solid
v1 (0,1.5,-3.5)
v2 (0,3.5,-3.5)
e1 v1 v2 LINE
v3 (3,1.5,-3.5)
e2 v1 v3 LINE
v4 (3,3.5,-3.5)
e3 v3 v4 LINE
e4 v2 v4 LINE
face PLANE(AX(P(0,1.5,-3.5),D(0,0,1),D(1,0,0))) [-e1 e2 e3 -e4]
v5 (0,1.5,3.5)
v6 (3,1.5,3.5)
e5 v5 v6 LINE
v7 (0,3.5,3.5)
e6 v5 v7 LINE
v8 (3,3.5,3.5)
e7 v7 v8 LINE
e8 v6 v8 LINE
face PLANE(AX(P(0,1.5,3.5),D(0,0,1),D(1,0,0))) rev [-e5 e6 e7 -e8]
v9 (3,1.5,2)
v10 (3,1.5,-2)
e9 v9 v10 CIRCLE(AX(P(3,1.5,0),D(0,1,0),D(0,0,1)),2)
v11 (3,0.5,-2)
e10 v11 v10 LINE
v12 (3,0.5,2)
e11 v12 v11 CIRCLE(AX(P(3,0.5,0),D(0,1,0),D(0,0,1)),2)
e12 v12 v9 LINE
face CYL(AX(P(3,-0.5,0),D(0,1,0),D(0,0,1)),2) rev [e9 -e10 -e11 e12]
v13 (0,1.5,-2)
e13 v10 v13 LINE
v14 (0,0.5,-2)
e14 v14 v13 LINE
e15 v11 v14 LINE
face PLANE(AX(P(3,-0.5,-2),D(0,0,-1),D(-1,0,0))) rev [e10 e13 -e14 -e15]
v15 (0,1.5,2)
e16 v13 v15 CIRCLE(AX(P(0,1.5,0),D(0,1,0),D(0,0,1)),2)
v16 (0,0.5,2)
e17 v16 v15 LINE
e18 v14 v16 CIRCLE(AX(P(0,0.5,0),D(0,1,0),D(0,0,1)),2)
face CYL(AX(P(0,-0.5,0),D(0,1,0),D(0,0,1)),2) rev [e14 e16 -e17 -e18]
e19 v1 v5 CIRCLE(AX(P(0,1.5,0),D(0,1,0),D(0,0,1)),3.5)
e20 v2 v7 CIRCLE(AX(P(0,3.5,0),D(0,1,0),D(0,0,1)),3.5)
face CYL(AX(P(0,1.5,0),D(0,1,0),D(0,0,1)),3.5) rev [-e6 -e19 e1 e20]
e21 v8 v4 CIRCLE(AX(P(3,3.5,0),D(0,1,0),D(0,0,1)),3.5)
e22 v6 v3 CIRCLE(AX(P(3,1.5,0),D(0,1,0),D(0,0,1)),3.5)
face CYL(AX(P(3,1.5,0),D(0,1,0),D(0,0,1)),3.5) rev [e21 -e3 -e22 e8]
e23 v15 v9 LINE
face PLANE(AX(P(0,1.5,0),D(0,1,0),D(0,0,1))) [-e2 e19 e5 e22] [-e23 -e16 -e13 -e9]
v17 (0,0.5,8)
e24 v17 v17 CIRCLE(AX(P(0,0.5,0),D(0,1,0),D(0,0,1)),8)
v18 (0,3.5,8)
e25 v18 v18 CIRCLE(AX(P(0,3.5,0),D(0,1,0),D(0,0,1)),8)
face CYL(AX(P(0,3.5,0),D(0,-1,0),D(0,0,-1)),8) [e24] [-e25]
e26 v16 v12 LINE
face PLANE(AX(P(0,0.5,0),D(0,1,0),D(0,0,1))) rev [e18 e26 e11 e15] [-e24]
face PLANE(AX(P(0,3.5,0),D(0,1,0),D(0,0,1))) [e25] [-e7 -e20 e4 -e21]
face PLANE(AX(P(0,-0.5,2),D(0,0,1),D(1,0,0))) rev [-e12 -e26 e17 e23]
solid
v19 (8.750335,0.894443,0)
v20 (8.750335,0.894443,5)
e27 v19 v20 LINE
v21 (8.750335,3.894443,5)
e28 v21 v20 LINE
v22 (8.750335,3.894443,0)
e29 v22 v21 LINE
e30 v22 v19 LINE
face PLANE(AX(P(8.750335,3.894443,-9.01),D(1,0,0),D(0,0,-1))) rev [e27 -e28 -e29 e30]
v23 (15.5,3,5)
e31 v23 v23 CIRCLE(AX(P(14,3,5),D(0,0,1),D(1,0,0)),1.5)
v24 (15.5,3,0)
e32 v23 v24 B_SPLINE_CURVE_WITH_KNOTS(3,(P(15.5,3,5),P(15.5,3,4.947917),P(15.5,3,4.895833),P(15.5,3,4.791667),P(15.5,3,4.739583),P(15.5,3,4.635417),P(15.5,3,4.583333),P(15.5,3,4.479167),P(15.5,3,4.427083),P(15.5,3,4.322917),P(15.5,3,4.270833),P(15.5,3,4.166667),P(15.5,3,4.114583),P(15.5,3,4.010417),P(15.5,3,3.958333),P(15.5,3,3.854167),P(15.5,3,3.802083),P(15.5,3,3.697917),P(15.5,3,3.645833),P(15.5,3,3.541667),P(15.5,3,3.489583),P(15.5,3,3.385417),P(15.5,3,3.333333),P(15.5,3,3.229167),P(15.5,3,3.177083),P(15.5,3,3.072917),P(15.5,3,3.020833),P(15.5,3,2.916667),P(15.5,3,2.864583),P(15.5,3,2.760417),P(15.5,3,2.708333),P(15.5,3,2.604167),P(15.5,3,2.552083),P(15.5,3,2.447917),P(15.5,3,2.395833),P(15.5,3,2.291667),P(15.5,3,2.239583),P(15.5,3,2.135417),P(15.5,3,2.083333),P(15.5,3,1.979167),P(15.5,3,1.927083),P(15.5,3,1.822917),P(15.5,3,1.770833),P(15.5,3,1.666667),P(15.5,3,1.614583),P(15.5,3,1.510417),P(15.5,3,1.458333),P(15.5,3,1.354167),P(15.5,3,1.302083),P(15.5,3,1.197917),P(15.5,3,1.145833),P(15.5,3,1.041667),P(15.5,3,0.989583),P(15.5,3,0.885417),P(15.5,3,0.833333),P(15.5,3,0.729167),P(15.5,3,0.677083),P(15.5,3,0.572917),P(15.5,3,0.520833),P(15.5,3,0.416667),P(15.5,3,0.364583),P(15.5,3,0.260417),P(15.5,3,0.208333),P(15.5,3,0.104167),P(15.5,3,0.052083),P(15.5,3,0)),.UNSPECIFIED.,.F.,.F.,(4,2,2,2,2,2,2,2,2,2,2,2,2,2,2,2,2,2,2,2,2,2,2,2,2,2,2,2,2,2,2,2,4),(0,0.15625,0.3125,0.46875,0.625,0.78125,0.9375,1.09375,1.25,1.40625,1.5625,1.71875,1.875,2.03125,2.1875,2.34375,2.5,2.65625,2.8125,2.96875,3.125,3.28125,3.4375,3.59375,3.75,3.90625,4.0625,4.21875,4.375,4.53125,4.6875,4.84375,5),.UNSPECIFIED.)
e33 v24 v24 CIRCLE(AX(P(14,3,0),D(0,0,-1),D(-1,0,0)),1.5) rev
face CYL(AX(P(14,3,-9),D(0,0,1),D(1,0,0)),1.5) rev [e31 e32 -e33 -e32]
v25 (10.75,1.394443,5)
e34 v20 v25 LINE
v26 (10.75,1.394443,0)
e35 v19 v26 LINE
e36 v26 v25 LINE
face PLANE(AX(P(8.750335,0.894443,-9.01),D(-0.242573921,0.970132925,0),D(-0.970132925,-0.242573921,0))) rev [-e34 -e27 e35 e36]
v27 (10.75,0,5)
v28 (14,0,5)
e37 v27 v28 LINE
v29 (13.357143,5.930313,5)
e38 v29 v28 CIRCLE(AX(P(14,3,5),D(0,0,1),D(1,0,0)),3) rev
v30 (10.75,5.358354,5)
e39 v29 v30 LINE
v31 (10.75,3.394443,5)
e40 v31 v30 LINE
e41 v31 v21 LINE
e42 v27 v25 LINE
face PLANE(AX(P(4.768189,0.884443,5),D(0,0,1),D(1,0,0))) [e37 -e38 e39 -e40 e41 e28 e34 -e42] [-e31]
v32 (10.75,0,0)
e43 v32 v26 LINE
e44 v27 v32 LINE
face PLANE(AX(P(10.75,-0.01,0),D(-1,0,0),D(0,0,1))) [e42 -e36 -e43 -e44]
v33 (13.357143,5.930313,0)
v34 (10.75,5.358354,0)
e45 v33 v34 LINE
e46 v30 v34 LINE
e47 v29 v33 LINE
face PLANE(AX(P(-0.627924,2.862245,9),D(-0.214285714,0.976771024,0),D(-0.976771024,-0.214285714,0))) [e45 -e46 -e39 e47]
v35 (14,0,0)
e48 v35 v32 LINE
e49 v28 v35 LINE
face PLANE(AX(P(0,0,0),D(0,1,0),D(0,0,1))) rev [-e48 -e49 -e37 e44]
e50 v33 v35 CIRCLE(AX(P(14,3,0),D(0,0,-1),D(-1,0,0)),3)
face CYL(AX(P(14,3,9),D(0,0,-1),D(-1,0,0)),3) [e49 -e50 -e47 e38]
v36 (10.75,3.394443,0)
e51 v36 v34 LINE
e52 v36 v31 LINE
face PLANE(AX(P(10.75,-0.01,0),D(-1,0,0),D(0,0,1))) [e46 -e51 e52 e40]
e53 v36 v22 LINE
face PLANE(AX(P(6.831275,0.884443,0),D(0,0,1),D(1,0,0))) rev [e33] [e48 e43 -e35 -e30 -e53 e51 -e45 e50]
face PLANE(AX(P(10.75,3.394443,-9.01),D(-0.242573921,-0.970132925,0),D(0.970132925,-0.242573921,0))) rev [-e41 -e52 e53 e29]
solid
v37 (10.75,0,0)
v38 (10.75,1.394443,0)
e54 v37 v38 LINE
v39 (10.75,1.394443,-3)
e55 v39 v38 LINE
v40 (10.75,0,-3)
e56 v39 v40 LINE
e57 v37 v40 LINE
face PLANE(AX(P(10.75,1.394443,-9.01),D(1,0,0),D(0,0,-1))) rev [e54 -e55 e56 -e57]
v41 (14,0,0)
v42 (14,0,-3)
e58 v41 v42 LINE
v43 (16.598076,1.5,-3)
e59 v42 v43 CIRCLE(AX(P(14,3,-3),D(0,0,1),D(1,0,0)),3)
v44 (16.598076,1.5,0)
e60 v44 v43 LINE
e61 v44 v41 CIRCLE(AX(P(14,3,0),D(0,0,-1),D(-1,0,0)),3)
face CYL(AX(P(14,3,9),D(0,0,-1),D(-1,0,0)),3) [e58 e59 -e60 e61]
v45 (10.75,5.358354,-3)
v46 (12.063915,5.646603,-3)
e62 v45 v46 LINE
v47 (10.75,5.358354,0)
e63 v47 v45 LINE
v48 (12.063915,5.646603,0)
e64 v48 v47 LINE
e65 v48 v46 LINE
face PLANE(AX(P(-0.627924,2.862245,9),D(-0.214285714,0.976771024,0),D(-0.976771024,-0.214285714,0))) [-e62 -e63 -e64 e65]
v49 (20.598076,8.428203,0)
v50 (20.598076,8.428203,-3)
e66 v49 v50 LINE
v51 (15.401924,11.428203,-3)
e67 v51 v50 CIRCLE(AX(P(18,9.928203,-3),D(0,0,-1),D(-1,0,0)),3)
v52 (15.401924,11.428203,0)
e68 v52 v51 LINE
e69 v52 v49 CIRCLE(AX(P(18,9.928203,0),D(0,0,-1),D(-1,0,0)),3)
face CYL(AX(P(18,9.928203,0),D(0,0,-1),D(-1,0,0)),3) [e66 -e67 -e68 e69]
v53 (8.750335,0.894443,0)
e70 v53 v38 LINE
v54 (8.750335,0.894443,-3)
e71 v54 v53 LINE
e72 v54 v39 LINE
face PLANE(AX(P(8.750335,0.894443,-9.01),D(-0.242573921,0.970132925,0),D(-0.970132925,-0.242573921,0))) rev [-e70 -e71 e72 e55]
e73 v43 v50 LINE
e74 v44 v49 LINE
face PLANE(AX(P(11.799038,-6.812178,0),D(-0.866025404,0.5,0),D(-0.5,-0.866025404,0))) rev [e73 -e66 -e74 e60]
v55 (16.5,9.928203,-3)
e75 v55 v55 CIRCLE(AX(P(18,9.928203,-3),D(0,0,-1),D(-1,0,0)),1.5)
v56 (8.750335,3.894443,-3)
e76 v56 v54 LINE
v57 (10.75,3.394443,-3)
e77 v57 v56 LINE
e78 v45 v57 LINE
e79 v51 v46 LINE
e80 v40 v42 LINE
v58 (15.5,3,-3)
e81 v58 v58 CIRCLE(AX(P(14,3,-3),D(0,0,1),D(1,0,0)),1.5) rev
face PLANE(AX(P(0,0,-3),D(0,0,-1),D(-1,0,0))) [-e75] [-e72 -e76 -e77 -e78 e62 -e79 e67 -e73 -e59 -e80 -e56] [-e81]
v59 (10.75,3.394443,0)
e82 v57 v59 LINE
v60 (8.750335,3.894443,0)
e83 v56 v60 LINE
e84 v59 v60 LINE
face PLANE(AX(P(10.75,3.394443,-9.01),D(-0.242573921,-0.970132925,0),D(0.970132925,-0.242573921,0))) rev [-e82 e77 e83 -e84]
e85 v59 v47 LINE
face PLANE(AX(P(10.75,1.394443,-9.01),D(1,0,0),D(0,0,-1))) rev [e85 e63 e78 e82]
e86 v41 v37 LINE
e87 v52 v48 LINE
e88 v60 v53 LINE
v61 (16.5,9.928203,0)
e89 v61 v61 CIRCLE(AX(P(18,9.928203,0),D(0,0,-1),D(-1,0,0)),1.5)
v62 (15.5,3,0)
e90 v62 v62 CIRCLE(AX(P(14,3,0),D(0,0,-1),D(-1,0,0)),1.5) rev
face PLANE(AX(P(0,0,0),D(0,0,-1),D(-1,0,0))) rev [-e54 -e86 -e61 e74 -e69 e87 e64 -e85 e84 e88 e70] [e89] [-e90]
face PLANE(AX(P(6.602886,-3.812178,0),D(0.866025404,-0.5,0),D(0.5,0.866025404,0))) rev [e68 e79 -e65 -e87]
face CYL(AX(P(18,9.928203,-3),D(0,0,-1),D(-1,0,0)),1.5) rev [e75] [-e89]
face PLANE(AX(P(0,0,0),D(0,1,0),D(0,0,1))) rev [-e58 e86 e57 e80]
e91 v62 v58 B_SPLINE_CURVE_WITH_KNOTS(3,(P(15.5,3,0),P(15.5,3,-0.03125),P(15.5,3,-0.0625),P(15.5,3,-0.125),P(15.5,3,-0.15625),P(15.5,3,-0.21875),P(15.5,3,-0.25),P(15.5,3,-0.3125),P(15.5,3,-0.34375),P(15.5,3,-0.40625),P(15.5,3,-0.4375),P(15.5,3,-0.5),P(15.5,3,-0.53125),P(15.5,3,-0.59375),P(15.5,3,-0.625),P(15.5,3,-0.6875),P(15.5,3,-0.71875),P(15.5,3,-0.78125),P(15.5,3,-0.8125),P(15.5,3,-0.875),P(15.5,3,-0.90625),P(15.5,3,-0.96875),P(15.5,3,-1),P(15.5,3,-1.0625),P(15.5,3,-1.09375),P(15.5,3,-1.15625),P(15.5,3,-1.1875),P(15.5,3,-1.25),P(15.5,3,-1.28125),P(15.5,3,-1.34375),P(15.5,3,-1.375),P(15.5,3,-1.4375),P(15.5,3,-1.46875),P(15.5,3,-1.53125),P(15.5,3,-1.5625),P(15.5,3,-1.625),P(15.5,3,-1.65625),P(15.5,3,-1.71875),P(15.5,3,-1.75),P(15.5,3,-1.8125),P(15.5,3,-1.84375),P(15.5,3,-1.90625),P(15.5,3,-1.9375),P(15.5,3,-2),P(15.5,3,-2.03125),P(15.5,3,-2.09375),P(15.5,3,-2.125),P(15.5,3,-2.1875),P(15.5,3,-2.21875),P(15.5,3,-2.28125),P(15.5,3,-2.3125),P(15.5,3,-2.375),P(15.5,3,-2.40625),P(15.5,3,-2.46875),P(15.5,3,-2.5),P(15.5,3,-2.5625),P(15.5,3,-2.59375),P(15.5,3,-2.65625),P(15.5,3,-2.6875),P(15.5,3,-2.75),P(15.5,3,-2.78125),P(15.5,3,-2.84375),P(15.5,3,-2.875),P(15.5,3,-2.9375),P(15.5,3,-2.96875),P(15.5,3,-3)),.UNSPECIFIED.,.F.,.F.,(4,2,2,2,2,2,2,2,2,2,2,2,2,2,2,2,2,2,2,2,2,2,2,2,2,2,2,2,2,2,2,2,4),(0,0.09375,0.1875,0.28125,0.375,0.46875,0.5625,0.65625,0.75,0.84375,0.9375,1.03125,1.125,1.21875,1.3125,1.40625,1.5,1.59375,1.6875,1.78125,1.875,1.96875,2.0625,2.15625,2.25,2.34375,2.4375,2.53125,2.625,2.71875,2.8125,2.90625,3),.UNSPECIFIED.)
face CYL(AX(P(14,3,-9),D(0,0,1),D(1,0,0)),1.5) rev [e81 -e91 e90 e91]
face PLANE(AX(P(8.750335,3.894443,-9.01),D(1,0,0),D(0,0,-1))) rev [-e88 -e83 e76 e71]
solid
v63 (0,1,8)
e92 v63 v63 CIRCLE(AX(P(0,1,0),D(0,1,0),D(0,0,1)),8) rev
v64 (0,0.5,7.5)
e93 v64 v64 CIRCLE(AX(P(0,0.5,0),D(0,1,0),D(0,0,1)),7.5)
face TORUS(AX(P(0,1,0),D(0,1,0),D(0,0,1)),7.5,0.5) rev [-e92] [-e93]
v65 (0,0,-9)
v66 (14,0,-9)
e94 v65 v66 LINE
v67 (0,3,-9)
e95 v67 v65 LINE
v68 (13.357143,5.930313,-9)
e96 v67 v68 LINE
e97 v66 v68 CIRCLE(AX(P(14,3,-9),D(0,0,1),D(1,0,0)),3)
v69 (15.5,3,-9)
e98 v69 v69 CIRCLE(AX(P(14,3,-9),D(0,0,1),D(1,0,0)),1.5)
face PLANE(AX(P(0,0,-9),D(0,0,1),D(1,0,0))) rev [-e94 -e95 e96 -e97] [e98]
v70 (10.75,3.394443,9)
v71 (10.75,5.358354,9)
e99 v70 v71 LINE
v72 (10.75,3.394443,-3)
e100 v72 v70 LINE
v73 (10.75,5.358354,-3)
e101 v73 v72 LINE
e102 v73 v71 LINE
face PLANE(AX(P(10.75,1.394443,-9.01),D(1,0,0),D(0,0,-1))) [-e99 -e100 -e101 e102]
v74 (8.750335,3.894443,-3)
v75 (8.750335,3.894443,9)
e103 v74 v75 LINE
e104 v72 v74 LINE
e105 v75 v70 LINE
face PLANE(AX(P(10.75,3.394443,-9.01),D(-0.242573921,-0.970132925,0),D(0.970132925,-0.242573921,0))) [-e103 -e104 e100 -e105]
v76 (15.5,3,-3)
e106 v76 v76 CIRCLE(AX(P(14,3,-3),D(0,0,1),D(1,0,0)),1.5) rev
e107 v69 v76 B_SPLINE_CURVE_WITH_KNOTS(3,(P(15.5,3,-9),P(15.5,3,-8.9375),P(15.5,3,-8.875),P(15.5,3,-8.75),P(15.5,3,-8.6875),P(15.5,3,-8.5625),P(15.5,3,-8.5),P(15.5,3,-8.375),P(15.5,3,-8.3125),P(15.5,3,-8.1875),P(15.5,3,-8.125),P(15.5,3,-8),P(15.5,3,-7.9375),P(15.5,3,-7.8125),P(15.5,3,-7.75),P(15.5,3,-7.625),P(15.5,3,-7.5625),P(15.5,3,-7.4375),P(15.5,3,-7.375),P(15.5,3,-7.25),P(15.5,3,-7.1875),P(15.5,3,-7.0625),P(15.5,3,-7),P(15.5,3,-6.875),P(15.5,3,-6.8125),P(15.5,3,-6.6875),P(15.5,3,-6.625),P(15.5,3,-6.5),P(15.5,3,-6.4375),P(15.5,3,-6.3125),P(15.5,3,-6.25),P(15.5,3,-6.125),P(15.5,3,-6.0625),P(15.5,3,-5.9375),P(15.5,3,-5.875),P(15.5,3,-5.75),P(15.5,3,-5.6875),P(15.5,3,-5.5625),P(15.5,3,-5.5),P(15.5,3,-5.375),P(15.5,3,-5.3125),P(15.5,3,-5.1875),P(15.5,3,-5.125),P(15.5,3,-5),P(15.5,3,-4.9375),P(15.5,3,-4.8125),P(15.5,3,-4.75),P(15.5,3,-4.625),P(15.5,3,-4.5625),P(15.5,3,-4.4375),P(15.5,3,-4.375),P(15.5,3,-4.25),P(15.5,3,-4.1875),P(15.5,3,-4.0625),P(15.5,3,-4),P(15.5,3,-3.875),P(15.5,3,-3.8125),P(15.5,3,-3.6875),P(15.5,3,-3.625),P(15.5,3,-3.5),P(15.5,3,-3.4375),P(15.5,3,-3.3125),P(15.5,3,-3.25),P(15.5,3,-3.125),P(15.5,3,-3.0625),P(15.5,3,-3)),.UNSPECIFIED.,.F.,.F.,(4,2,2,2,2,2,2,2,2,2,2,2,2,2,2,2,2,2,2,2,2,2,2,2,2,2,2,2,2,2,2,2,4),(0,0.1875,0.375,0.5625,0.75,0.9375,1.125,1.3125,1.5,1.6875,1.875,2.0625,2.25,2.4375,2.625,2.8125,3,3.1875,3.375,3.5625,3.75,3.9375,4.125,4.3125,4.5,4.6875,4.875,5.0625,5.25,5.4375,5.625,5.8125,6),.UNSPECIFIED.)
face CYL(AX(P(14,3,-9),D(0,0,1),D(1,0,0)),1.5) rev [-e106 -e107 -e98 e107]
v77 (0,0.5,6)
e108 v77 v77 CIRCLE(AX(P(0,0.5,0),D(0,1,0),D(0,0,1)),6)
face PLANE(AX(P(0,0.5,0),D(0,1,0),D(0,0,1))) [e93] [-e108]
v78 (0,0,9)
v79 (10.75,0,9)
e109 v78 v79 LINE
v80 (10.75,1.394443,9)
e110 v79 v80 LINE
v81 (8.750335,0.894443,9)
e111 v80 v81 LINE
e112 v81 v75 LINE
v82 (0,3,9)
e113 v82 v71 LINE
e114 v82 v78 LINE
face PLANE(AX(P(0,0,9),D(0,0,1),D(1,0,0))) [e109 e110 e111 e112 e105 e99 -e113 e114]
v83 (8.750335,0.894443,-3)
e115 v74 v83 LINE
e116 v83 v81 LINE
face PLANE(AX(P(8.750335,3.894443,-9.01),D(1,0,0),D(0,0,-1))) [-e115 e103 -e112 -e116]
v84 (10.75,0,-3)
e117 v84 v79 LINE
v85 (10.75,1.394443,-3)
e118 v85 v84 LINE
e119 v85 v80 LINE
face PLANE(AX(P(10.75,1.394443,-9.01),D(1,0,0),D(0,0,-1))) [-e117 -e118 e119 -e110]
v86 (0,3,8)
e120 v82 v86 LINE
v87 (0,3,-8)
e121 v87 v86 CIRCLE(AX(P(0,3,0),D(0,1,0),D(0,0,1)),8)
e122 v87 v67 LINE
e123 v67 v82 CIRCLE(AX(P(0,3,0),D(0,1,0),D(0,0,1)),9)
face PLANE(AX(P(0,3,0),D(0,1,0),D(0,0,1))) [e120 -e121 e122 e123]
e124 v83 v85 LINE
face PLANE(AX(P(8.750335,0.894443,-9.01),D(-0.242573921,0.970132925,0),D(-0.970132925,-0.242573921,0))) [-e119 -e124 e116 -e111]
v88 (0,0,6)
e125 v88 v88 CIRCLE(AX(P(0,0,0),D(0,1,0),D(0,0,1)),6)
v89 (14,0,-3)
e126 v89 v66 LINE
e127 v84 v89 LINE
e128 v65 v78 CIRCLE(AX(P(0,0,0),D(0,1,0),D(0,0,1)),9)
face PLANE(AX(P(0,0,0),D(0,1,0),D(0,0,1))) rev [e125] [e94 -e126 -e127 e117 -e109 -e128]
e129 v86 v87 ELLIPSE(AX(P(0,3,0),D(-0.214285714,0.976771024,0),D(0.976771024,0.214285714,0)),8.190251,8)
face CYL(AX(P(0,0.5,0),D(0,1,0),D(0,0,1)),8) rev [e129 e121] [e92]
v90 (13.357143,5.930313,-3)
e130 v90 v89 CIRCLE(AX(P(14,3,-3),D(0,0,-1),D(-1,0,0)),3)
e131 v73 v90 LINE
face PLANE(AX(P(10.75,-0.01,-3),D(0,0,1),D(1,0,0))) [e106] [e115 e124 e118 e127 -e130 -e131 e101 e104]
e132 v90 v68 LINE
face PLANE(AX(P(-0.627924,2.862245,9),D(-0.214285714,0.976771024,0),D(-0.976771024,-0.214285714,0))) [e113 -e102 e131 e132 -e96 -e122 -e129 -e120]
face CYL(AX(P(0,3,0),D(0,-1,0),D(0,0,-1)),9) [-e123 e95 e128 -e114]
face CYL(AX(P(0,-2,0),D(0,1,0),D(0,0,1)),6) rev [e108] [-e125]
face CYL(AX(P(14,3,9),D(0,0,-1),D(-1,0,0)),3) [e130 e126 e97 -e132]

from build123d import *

# Parameters (mm, degrees)
SKETCH1_R               = 9
BOSS_EXTRUDE1_DEPTH     = 3
BOSS_EXTRUDE2_START     = -9
BOSS_EXTRUDE2_DEPTH     = 18
SKETCH5_R               = 8
CUT_EXTRUDE3_DEPTH      = 2.5
SKETCH6_R               = 6
CUT_EXTRUDE4_DEPTH      = 2.5
FILLET3_R               = 0.5
CUT_EXTRUDE5_DEPTH      = 4
HOLE1_START             = -9
HOLE1_OUTLINE_R         = 1.5
HOLE1_DEPTH             = 14
BOSS_EXTRUDE4_DEPTH     = 3
F_3_0_MM_DOWEL_HOLES1_D = 3
SKETCH14_R              = 8
BOSS_EXTRUDE5_DEPTH     = 3
CUT_EXTRUDE6_DEPTH      = 2
CUT_EXTRUDE7_DEPTH      = 2
SPLIT1_SURFACE_1_BACK   = 38.298
SPLIT1_SURFACE_1_DEPTH  = 76.596
SPLIT1_SURFACE_2_BACK   = 38.298
SPLIT1_SURFACE_2_DEPTH  = 76.596
SPLIT2_SURFACE_3_BACK   = 38.298
SPLIT2_SURFACE_3_DEPTH  = 76.596
SPLIT2_SURFACE_4_BACK   = 38.298
SPLIT2_SURFACE_4_DEPTH  = 76.596
SPLIT3_SURFACE_5_BACK   = 38.298
SPLIT3_SURFACE_5_DEPTH  = 76.596
SPLIT3_SURFACE_6_BACK   = 38.298
SPLIT3_SURFACE_6_DEPTH  = 76.596
SPLIT4_SURFACE_7_BACK   = 38.298
SPLIT4_SURFACE_7_DEPTH  = 76.596
SPLIT4_SURFACE_8_BACK   = 38.298
SPLIT4_SURFACE_8_DEPTH  = 76.596
SPLIT5_START            = -3
SPLIT5_DEPTH            = 3
SPLIT5_2_DEPTH          = 12
SPLIT5_3_DEPTH          = 5
SPLIT5_START_2          = 5
SPLIT5_4_DEPTH          = 4


with BuildPart() as part:
    # Sketch1 → Boss-Extrude1 (new body)
    with BuildSketch(Plane(origin=(0, 0, 0), x_dir=(1, 0, 0), z_dir=(0, 1, 0))):
        with Locations(Location((0, 0, 0), (0, 0, 270))):
            Circle(SKETCH1_R)
    extrude(amount=BOSS_EXTRUDE1_DEPTH)

    # Boss-Extrude2: read off the stored shape, not the designer's step
    # Boss-Extrude2 outline → Boss-Extrude2 (add)
    with BuildSketch(Plane.XY.offset(BOSS_EXTRUDE2_START)):
        with BuildLine():
            Line((13.357142857, 5.930313071), (0, 3))
            Line((0, 3), (0, 0))
            Line((0, 0), (14, 0))
            ThreePointArc((14, 0), (16.982527386, 3.323311604), (13.357142857, 5.930313071))
        make_face()
    extrude(amount=BOSS_EXTRUDE2_DEPTH)

    # Sketch5 → Cut-Extrude3 (cut, symmetric)
    with BuildSketch(Plane(origin=(0, 3, 0), x_dir=(1, 0, 0), z_dir=(0, 1, 0))):
        with Locations(Location((0, 0, 0), (0, 0, 270))):
            Circle(SKETCH5_R)
    extrude(amount=CUT_EXTRUDE3_DEPTH, both=True, mode=Mode.SUBTRACT)

    # Sketch6 → Cut-Extrude4 (cut, symmetric)
    with BuildSketch(Plane(origin=(0, 0.5, 0), x_dir=(1, 0, 0), z_dir=(0, 1, 0))):
        with Locations(Location((0, 0, 0), (0, 0, 270))):
            Circle(SKETCH6_R)
    extrude(amount=CUT_EXTRUDE4_DEPTH, both=True, mode=Mode.SUBTRACT)

    # Fillet3
    fillet3_edges = [part.edges().sort_by_distance(p)[0] for p in [
        (0, 0.5, -8),
    ]]
    fillet(fillet3_edges, radius=FILLET3_R)

    # Sketch7 → Cut-Extrude5 (cut)
    with BuildSketch(Plane(origin=(0, 0, 9), x_dir=(-1, 0, 0), z_dir=(0, 0, -1))):
        Polygon((-10.75, -52.569250145), (-10.75, -0.796086747), (-10.75, 6.228178627), (-10.75, 58.001342025), (-114.296326796, 58.001342025), (-114.296326796, -52.569250145), align=None)
    extrude(amount=CUT_EXTRUDE5_DEPTH, mode=Mode.SUBTRACT)

    # Hole1: read off the stored shape, not the designer's step
    # Hole1 outline → Hole1 (cut)
    with BuildSketch(Plane.XY.offset(HOLE1_START)):
        with Locations((14, 3)):
            Circle(HOLE1_OUTLINE_R)
    extrude(amount=HOLE1_DEPTH, mode=Mode.SUBTRACT)

    # Sketch9 → Boss-Extrude4 (add)
    with BuildSketch(Plane(origin=(0, 0, -3), x_dir=(-1, 0, 0), z_dir=(0, 0, -1))):
        with BuildLine():
            Line((-20.598076211, 8.42820323), (-16.598076211, 1.5))
            ThreePointArc((-16.598076211, 1.5), (-16.421288681, 4.771259756), (-13.357142857, 5.930313071))
            Line((-13.357142857, 5.930313071), (-12.063915065, 5.646602524))
            Line((-12.063915065, 5.646602524), (-15.401923789, 11.42820323))
            ThreePointArc((-15.401923789, 11.42820323), (-19.5, 12.526279442), (-20.598076211, 8.42820323))
        make_face()
    extrude(amount=-BOSS_EXTRUDE4_DEPTH)

    # Ø3.0 mm Dowel Holes1 (through all)
    with Locations(Plane(origin=(18, 9.92820323, -3), x_dir=(-1, 0, 0), z_dir=(0, 0, -1))):
        with Locations((0, 0)):
            Hole(F_3_0_MM_DOWEL_HOLES1_D / 2)


with BuildPart() as body_2:
    # Sketch14 → Boss-Extrude5 (new body)
    with BuildSketch(Plane(origin=(0, 0.5, 0), x_dir=(1, 0, 0), z_dir=(0, 1, 0))):
        with Locations(Location((0, 0, 0), (0, 0, 270))):
            Circle(SKETCH14_R)
    extrude(amount=BOSS_EXTRUDE5_DEPTH)

    # Sketch15 → Cut-Extrude6 (cut)
    with BuildSketch(Plane(origin=(0, 3.5, 0), x_dir=(1, 0, 0), z_dir=(0, 1, 0))):
        with BuildLine():
            Line((0, 3.5), (3, 3.5))
            ThreePointArc((3, 3.5), (6.5, 0), (3, -3.5))
            Line((3, -3.5), (0, -3.5))
            ThreePointArc((0, -3.5), (-3.5, 0), (0, 3.5))
        make_face()
    extrude(amount=-CUT_EXTRUDE6_DEPTH, mode=Mode.SUBTRACT)

    # Sketch17 → Cut-Extrude7 (cut)
    with BuildSketch(Plane(origin=(0, 1.5, 0), x_dir=(1, 0, 0), z_dir=(0, 1, 0))):
        with BuildLine():
            Line((0, -2), (3, -2))
            ThreePointArc((3, -2), (5, 0), (3, 2))
            Line((3, 2), (0, 2))
            ThreePointArc((0, 2), (-2, 0), (0, -2))
        make_face()
    extrude(amount=-CUT_EXTRUDE7_DEPTH, mode=Mode.SUBTRACT)


with BuildPart() as body_3:
    # Split1: the piece behind the surface
    add(part.part)
    # Split1 surface: a surface, the sketch's curves swept straight by 76.596 mm
    with BuildLine(Plane.XY.offset(9).offset(-SPLIT1_SURFACE_1_BACK), mode=Mode.PRIVATE) as split1_surface_1_path:
        Line((10.75, 7.850645476), (10.75, 3.394442709))
        Line((10.75, 3.394442709), (8.750335479, 3.894442709))
        Line((8.750335479, 3.894442709), (8.750335479, 0.894442709))
        Line((8.750335479, 0.894442709), (10.75, 1.394442709))
        Line((10.75, 1.394442709), (10.75, -1.763593227))
    split1_surface_1 = Shell.extrude(split1_surface_1_path.wire(), (0 * SPLIT1_SURFACE_1_DEPTH, 0 * SPLIT1_SURFACE_1_DEPTH, 1 * SPLIT1_SURFACE_1_DEPTH))
    split(bisect_by=split1_surface_1, keep=Keep.BOTTOM)


with BuildPart() as part_1:
    add(part.part)

    # Split1: split by a surface, the side it looks to stays
    # Split1 surface: a surface, the sketch's curves swept straight by 76.596 mm
    with BuildLine(Plane.XY.offset(9).offset(-SPLIT1_SURFACE_2_BACK), mode=Mode.PRIVATE) as split1_surface_2_path:
        Line((10.75, 7.850645476), (10.75, 3.394442709))
        Line((10.75, 3.394442709), (8.750335479, 3.894442709))
        Line((8.750335479, 3.894442709), (8.750335479, 0.894442709))
        Line((8.750335479, 0.894442709), (10.75, 1.394442709))
        Line((10.75, 1.394442709), (10.75, -1.763593227))
    split1_surface_2 = Shell.extrude(split1_surface_2_path.wire(), (0 * SPLIT1_SURFACE_2_DEPTH, 0 * SPLIT1_SURFACE_2_DEPTH, 1 * SPLIT1_SURFACE_2_DEPTH))
    split(bisect_by=split1_surface_2, keep=Keep.TOP)


with BuildPart() as body_4:
    # Split2: the piece behind the surface
    add(part_1.part)
    # Split2 surface: a surface, the sketch's curves swept straight by 76.596 mm
    with BuildLine(Plane(origin=(0, 3.5, 0), x_dir=(1, 0, 0), z_dir=(0, 1, 0)).offset(-SPLIT2_SURFACE_3_BACK), mode=Mode.PRIVATE) as split2_surface_3_path:
        Line((27.399686623, 0), (10.75, 0))
        Line((10.75, 0), (10.75, 3))
        Line((10.75, 3), (26.181796161, 3))
    split2_surface_3 = Shell.extrude(split2_surface_3_path.wire(), (0 * SPLIT2_SURFACE_3_DEPTH, 1 * SPLIT2_SURFACE_3_DEPTH, 0 * SPLIT2_SURFACE_3_DEPTH))
    split(bisect_by=split2_surface_3, keep=Keep.BOTTOM)


with BuildPart() as part_2:
    add(part_1.part)

    # Split2: split by a surface, the side it looks to stays
    # Split2 surface: a surface, the sketch's curves swept straight by 76.596 mm
    with BuildLine(Plane(origin=(0, 3.5, 0), x_dir=(1, 0, 0), z_dir=(0, 1, 0)).offset(-SPLIT2_SURFACE_4_BACK), mode=Mode.PRIVATE) as split2_surface_4_path:
        Line((27.399686623, 0), (10.75, 0))
        Line((10.75, 0), (10.75, 3))
        Line((10.75, 3), (26.181796161, 3))
    split2_surface_4 = Shell.extrude(split2_surface_4_path.wire(), (0 * SPLIT2_SURFACE_4_DEPTH, 1 * SPLIT2_SURFACE_4_DEPTH, 0 * SPLIT2_SURFACE_4_DEPTH))
    split(bisect_by=split2_surface_4, keep=Keep.TOP)


with BuildPart() as body_5:
    # Split3: the piece behind the surface
    add(part_2.part)
    # Split3 surface: a surface, the sketch's curves swept straight by 76.596 mm
    with BuildLine(Plane(origin=(0, 3.5, 0), x_dir=(1, 0, 0), z_dir=(0, 1, 0)).offset(-SPLIT3_SURFACE_5_BACK), mode=Mode.PRIVATE) as split3_surface_5_path:
        Line((10.75, 0), (24.171696764, 0))
        Line((24.171696764, 0), (24.171696764, -5))
        Line((24.171696764, -5), (10.75, -5))
        Line((10.75, -5), (10.75, 0))
    split3_surface_5 = Shell.extrude(split3_surface_5_path.wire(), (0 * SPLIT3_SURFACE_5_DEPTH, 1 * SPLIT3_SURFACE_5_DEPTH, 0 * SPLIT3_SURFACE_5_DEPTH))
    split(bisect_by=split3_surface_5, keep=Keep.BOTTOM)


with BuildPart() as part_3:
    add(part_2.part)

    # Split3: split by a surface, the side it looks to stays
    # Split3 surface: a surface, the sketch's curves swept straight by 76.596 mm
    with BuildLine(Plane(origin=(0, 3.5, 0), x_dir=(1, 0, 0), z_dir=(0, 1, 0)).offset(-SPLIT3_SURFACE_6_BACK), mode=Mode.PRIVATE) as split3_surface_6_path:
        Line((10.75, 0), (24.171696764, 0))
        Line((24.171696764, 0), (24.171696764, -5))
        Line((24.171696764, -5), (10.75, -5))
        Line((10.75, -5), (10.75, 0))
    split3_surface_6 = Shell.extrude(split3_surface_6_path.wire(), (0 * SPLIT3_SURFACE_6_DEPTH, 1 * SPLIT3_SURFACE_6_DEPTH, 0 * SPLIT3_SURFACE_6_DEPTH))
    split(bisect_by=split3_surface_6, keep=Keep.TOP)


with BuildPart() as body_6:
    # Split4: the piece behind the surface
    add(part_3.part)
    # Split4 surface: a surface, the sketch's curves swept straight by 76.596 mm
    with BuildLine(Plane.XY.offset(9).offset(-SPLIT4_SURFACE_7_BACK), mode=Mode.PRIVATE) as split4_surface_7_path:
        Line((8.750335479, 0.894442709), (10.75, 1.394442709))
        Line((10.75, 1.394442709), (10.75, 3.394442709))
        Line((10.75, 3.394442709), (8.750335479, 3.894442709))
        Line((8.750335479, 3.894442709), (8.750335479, 0.894442709))
    split4_surface_7 = Shell.extrude(split4_surface_7_path.wire(), (0 * SPLIT4_SURFACE_7_DEPTH, 0 * SPLIT4_SURFACE_7_DEPTH, 1 * SPLIT4_SURFACE_7_DEPTH))
    split(bisect_by=split4_surface_7, keep=Keep.BOTTOM)


with BuildPart() as part_4:
    add(part_3.part)

    # Split4: split by a surface, the side it looks to stays
    # Split4 surface: a surface, the sketch's curves swept straight by 76.596 mm
    with BuildLine(Plane.XY.offset(9).offset(-SPLIT4_SURFACE_8_BACK), mode=Mode.PRIVATE) as split4_surface_8_path:
        Line((8.750335479, 0.894442709), (10.75, 1.394442709))
        Line((10.75, 1.394442709), (10.75, 3.394442709))
        Line((10.75, 3.394442709), (8.750335479, 3.894442709))
        Line((8.750335479, 3.894442709), (8.750335479, 0.894442709))
    split4_surface_8 = Shell.extrude(split4_surface_8_path.wire(), (0 * SPLIT4_SURFACE_8_DEPTH, 0 * SPLIT4_SURFACE_8_DEPTH, 1 * SPLIT4_SURFACE_8_DEPTH))
    split(bisect_by=split4_surface_8, keep=Keep.TOP)

    # Split5 2 outline → Split5 2 (cut)
    with BuildSketch(Plane.XY.offset(SPLIT5_START)):
        Polygon((8.750335479, 0.894442709), (10.75, 1.394442709), (10.75, 3.394442709), (8.750335479, 3.894442709), align=None)
    extrude(amount=SPLIT5_2_DEPTH, mode=Mode.SUBTRACT)


with BuildPart() as body_7:
    # Split5: read off the stored shape, not the designer's step
    # Split5 outline → Split5 (new body)
    with BuildSketch(Plane.XY.offset(SPLIT5_START)):
        Polygon((10.75, 3.394442709), (8.750335479, 3.894442709), (8.750335479, 0.894442709), (10.75, 1.394442709), align=None)
    extrude(amount=SPLIT5_DEPTH)


with BuildPart() as body_8:
    # Split5 3 outline → Split5 3 (new body)
    with BuildSketch(Plane.XY):
        Polygon((10.75, 3.394442709), (8.750335479, 3.894442709), (8.750335479, 0.894442709), (10.75, 1.394442709), align=None)
    extrude(amount=SPLIT5_3_DEPTH)


with BuildPart() as body_9:
    # Split5 4 outline → Split5 4 (new body)
    with BuildSketch(Plane.XY.offset(SPLIT5_START_2)):
        Polygon((10.75, 3.394442709), (8.750335479, 3.894442709), (8.750335479, 0.894442709), (10.75, 1.394442709), align=None)
    extrude(amount=SPLIT5_4_DEPTH)


with BuildPart() as body_5_1:
    add(body_5.part)

    # Combine1: read off the stored shape, not the designer's step
    # Combine1: union body 8
    add(body_8.part)


with BuildPart() as body_3_1:
    add(body_3.part)

    # Combine2: read off the stored shape, not the designer's step
    # Combine2: union part, body 6
    add(part_4.part)
    add(body_6.part)


with BuildPart() as body_4_1:
    add(body_4.part)

    # Combine3: read off the stored shape, not the designer's step
    # Combine3: union body 7
    add(body_7.part)


solid = Compound([body_2.part, body_5_1.part, body_3_1.part, body_4_1.part])
